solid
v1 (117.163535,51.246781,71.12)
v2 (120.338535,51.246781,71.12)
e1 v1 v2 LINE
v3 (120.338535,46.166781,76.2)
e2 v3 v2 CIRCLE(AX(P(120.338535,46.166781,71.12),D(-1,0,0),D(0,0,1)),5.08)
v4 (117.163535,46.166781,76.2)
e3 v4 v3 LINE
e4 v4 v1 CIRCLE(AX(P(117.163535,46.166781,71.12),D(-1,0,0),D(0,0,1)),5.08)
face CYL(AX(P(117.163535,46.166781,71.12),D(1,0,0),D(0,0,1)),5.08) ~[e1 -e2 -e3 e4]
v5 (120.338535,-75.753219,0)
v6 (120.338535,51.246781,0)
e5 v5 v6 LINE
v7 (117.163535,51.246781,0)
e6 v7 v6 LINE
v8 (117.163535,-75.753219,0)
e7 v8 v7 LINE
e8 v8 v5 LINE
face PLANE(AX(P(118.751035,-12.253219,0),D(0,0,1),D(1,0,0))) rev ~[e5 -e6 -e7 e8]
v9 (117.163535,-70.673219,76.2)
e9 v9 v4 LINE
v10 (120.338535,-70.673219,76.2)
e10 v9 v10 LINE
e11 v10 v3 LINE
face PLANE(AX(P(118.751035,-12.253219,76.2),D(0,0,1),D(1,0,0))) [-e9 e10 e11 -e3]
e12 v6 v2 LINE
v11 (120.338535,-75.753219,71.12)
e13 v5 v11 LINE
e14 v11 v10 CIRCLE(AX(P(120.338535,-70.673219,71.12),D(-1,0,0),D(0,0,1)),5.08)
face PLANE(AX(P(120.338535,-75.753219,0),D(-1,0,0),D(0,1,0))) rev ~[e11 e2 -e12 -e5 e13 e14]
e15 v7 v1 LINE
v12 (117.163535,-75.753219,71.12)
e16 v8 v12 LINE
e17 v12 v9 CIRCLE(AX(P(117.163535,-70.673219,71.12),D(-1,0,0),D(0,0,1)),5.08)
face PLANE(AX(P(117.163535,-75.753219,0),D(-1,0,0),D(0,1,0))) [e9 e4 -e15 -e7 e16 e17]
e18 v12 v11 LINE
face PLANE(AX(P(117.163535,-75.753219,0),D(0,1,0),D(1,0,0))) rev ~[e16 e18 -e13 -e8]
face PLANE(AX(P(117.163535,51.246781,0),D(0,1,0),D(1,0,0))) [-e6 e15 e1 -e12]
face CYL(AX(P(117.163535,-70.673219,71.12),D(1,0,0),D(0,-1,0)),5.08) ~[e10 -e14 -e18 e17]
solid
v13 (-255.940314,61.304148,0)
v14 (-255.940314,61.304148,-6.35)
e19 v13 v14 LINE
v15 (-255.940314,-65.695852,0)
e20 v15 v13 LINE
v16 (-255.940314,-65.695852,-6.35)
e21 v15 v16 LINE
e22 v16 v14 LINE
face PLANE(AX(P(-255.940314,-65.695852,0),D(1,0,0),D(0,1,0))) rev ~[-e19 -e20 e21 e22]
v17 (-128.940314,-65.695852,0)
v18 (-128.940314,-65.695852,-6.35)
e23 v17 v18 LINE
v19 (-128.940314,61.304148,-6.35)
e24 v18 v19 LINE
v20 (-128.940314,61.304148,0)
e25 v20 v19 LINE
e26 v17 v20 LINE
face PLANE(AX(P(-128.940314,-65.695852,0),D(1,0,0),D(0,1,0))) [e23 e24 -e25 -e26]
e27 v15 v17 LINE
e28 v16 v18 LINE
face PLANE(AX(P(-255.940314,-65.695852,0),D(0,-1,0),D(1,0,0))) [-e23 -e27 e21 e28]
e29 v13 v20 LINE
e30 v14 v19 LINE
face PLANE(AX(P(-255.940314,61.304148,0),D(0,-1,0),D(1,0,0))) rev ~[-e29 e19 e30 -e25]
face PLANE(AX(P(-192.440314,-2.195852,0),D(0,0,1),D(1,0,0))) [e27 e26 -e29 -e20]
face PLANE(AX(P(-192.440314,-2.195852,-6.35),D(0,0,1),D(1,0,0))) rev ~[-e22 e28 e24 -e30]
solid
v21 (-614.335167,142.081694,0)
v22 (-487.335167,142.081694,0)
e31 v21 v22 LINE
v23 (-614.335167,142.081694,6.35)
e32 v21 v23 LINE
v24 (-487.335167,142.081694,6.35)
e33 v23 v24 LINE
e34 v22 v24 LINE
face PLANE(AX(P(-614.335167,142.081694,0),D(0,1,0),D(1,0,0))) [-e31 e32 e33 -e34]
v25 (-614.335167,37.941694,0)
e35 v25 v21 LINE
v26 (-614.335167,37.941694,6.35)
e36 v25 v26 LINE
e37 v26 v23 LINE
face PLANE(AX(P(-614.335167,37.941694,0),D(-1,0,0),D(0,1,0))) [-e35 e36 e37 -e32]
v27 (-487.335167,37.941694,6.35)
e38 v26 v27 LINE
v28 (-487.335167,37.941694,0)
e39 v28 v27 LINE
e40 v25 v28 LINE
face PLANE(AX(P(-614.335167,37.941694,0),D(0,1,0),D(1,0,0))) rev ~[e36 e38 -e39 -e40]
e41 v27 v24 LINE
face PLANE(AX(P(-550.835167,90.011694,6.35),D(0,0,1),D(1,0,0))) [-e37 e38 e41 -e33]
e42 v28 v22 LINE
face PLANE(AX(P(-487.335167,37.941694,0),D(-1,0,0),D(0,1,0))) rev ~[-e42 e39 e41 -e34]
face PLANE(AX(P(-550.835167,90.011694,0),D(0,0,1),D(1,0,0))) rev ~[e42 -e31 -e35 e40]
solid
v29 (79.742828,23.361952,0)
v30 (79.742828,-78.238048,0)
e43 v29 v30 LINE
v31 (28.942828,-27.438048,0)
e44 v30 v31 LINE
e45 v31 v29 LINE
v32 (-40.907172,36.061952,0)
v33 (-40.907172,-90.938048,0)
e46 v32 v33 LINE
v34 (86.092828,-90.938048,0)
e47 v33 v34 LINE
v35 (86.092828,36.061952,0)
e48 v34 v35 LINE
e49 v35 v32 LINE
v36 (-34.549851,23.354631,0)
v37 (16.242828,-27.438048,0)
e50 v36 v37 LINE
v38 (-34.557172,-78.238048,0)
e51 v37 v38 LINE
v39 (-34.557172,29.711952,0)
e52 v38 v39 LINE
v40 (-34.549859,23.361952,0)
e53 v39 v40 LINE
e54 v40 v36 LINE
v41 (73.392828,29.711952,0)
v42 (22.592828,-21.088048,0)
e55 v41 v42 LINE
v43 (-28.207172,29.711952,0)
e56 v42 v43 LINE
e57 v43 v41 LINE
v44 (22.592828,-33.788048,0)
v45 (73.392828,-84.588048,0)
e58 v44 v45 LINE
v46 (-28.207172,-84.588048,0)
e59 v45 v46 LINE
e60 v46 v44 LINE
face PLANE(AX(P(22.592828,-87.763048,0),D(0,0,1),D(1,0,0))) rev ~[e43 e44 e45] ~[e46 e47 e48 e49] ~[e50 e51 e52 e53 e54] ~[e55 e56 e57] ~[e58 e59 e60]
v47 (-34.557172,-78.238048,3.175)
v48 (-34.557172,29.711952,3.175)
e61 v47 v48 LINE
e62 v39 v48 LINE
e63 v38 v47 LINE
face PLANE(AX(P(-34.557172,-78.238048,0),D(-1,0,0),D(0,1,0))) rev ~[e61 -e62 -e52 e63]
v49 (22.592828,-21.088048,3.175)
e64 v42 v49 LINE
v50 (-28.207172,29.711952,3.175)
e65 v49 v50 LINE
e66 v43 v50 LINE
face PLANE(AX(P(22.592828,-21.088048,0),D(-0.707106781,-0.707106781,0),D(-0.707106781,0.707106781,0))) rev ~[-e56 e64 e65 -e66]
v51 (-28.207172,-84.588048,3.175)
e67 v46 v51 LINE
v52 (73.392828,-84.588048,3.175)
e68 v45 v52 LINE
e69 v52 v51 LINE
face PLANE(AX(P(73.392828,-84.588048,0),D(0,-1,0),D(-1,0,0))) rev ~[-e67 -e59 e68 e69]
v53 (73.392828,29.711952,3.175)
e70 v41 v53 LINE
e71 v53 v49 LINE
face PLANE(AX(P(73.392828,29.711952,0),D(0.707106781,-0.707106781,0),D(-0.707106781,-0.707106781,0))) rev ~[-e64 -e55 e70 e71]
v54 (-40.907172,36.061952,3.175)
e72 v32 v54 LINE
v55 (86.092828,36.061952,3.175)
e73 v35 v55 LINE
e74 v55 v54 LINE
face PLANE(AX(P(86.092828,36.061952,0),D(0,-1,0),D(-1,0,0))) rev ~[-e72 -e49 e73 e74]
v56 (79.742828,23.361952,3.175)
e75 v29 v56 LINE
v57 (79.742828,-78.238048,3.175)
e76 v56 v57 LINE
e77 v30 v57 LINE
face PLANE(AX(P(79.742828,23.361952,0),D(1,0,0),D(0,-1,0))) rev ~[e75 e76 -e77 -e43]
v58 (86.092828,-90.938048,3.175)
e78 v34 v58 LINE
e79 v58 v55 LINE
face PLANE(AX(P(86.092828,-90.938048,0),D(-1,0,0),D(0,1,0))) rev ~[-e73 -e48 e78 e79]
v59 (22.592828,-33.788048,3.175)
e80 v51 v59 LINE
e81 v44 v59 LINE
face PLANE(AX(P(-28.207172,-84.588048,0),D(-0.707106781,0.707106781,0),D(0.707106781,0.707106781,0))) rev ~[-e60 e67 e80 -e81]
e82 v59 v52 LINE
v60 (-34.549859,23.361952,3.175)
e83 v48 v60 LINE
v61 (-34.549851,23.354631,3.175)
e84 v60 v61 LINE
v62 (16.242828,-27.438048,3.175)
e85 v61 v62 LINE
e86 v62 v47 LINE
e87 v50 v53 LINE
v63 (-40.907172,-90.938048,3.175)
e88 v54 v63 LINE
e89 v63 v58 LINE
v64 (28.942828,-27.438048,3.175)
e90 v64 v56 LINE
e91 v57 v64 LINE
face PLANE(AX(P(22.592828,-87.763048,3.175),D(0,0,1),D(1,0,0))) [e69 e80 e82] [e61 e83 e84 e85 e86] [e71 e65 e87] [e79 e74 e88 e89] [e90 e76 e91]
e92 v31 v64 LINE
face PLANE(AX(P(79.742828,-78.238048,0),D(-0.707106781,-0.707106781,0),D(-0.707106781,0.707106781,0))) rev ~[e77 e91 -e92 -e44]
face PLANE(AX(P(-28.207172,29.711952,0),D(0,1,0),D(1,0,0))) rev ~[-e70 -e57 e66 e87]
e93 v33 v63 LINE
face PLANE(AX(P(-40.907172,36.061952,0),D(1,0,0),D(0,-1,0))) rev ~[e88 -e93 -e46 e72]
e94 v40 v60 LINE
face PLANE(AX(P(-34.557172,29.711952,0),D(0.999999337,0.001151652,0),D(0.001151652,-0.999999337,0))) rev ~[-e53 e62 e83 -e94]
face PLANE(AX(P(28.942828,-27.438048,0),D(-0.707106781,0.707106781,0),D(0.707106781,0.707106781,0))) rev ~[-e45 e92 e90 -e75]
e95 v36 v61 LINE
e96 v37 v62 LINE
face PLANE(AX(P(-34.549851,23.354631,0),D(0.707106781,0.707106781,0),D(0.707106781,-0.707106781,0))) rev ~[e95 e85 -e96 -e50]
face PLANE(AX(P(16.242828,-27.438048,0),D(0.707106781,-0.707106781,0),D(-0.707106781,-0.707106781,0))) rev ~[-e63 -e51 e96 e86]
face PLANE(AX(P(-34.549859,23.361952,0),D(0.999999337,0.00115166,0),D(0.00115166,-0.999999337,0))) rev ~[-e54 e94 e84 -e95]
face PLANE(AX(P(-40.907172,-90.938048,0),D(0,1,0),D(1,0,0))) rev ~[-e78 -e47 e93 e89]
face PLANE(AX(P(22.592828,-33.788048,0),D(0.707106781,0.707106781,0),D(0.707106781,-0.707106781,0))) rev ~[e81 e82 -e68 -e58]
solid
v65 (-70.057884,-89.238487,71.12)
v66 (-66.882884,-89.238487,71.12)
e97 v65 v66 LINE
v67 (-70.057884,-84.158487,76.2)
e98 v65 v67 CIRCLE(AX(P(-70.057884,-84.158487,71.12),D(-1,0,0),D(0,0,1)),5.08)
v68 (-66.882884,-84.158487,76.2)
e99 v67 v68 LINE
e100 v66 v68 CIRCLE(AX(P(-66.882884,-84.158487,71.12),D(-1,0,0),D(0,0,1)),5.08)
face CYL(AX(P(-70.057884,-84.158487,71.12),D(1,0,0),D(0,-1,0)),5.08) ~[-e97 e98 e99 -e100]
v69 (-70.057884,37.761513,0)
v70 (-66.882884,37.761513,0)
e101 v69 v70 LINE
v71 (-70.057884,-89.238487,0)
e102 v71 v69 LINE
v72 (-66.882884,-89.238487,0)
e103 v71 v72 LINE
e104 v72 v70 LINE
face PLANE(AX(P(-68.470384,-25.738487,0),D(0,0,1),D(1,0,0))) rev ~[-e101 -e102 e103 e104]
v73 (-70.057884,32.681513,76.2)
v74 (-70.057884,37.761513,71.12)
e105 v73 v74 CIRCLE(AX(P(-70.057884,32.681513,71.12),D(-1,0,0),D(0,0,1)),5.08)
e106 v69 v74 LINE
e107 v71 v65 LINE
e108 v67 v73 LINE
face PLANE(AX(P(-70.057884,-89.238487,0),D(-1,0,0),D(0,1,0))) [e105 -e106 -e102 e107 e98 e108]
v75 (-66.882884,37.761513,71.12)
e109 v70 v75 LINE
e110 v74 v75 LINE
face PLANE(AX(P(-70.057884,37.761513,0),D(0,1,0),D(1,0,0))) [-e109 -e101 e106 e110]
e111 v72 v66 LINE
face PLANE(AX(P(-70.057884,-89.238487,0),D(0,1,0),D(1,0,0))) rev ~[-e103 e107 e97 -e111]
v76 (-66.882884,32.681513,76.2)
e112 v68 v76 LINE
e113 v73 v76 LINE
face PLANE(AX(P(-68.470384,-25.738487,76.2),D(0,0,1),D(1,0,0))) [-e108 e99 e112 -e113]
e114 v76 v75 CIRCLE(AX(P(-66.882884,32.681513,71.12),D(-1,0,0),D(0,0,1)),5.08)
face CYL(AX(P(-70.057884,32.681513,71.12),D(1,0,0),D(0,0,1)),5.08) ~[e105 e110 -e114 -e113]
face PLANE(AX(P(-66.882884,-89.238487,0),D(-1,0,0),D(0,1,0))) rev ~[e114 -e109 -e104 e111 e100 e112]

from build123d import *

# Parameters (mm, degrees)
F0_W      = 6.35
F0_H      = 6.35
F1_DEPTH  = 3.175
F2_W      = 3.175
F2_H      = 127
F3_DEPTH  = 76.2
F4_W      = 3.175
F4_H      = 127
F5_DEPTH  = 76.2
F6_W      = 127
F6_H      = 127
F7_DEPTH  = 6.35
F8_R      = 5.08
F9_R      = 5.08
F10_R     = 5.08
F11_R     = 5.08
F12_W     = 127
F12_H     = 104.14
F13_DEPTH = 6.35


# Not quite as in the source:
# - a length typed as a fraction of an inch, garbled in the dataset ("3 / 203.2 mm" for 3/8 in), is restored


with BuildPart() as f1:
    # F0 (on Top) → F1 (new body)
    with BuildSketch(Plane.XY):
        Polygon((-34.5571719459, -84.5880480751), (-40.9071719459, -84.5880480751), (-40.9071719459, -90.9380480751), (86.0928280541, -90.9380480751), (86.0928280541, -84.5880480751), (79.7428280541, -84.5880480751), (73.3928280541, -84.5880480751), (63.2345444911, -84.5880480751), (-28.2071719459, -84.5880480751), align=None)
        Polygon((79.7428280541, -78.2380480751), (28.9428280541, -27.4380480751), (22.5928280541, -33.7880480751), (73.3928280541, -84.5880480751), (73.3928280541, -78.2380480751), align=None)
        with Locations((76.5678280541, -81.4130480751)):
            Rectangle(F0_W, F0_H)
        with Locations((-31.3821719459, -81.4130480751)):
            Rectangle(F0_W, F0_H)
        Polygon((16.2428280541, -27.4380480751), (-34.5571719459, -78.2380480751), (-28.2071719459, -78.2380480751), (-28.2071719459, -84.5880480751), (22.5928280541, -33.7880480751), align=None)
        Polygon((22.5928280541, -21.0880480751), (-28.2071719459, 29.7119519249), (-28.2071719459, 23.3619519249), (-34.5498589529, 23.3619519249), (-34.5498505211, 23.3546305002), (16.2428280541, -27.4380480751), align=None)
        Polygon((28.9428280541, -27.4380480751), (22.5928280541, -21.0880480751), (16.2428280541, -27.4380480751), (22.5928280541, -33.7880480751), align=None)
        Polygon((73.3928280541, 23.3619519249), (73.3928280541, 29.7119519249), (22.5928280541, -21.0880480751), (28.9428280541, -27.4380480751), (79.7428280541, 23.3619519249), align=None)
        with Locations((76.5678280541, 26.5369519249)):
            Rectangle(F0_W, F0_H)
        Polygon((-28.2071719459, 29.7119519249), (-34.5571719459, 29.7119519249), (-34.5498589529, 23.3619519249), (-28.2071719459, 23.3619519249), align=None)
        Polygon((-40.9071719459, 29.7119519249), (-34.5571719459, 29.7119519249), (-28.2071719459, 29.7119519249), (73.3928280541, 29.7119519249), (79.7428280541, 29.7119519249), (86.0928280541, 29.7119519249), (86.0928280541, 36.0619519249), (-40.9071719459, 36.0619519249), align=None)
        Polygon((-34.5571719459, 23.3619519249), (-34.5571719459, 29.7119519249), (-40.9071719459, 29.7119519249), (-40.9071719459, -84.5880480751), (-34.5571719459, -84.5880480751), (-34.5571719459, -78.2380480751), align=None)
        Polygon((86.0928280541, 29.7119519249), (79.7428280541, 29.7119519249), (79.7428280541, 23.3619519249), (79.7428280541, -78.2380480751), (79.7428280541, -84.5880480751), (86.0928280541, -84.5880480751), align=None)
    extrude(amount=F1_DEPTH)


with BuildPart() as f3:
    # F2 (on Top) → F3 (new body)
    with BuildSketch(Plane.XY):
        with Locations((-68.4703838587, -25.738487184)):
            Rectangle(F2_W, F2_H)
    extrude(amount=F3_DEPTH)

    # F8
    f8_edges = [f3.edges().sort_by_distance(p)[0] for p in [
        (-68.470384, -89.238487, 76.2),
    ]]
    fillet(f8_edges, radius=F8_R)

    # F9
    f9_edges = [f3.edges().sort_by_distance(p)[0] for p in [
        (-68.470384, 37.761513, 76.2),
    ]]
    fillet(f9_edges, radius=F9_R)


with BuildPart() as f5:
    # F4 (on Top) → F5 (new body)
    with BuildSketch(Plane.XY):
        with Locations((118.7510346651, -12.2532194257)):
            Rectangle(F4_W, F4_H)
    extrude(amount=F5_DEPTH)

    # F10
    f10_edges = [f5.edges().sort_by_distance(p)[0] for p in [
        (118.751035, -75.753219, 76.2),
    ]]
    fillet(f10_edges, radius=F10_R)

    # F11
    f11_edges = [f5.edges().sort_by_distance(p)[0] for p in [
        (118.751035, 51.246781, 76.2),
    ]]
    fillet(f11_edges, radius=F11_R)


with BuildPart() as f7:
    # F6 (on Top) → F7 (new body)
    with BuildSketch(Plane.XY):
        with Locations((-192.4403140545, -2.1958520412)):
            Rectangle(F6_W, F6_H)
    extrude(amount=-F7_DEPTH)


with BuildPart() as f13:
    # F12 (on Top) → F13 (new body)
    with BuildSketch(Plane.XY):
        with Locations((-550.8351667404, 90.0116942596)):
            Rectangle(F12_W, F12_H)
    extrude(amount=F13_DEPTH)


solid = Compound([f1.part, f3.part, f5.part, f7.part, f13.part])
